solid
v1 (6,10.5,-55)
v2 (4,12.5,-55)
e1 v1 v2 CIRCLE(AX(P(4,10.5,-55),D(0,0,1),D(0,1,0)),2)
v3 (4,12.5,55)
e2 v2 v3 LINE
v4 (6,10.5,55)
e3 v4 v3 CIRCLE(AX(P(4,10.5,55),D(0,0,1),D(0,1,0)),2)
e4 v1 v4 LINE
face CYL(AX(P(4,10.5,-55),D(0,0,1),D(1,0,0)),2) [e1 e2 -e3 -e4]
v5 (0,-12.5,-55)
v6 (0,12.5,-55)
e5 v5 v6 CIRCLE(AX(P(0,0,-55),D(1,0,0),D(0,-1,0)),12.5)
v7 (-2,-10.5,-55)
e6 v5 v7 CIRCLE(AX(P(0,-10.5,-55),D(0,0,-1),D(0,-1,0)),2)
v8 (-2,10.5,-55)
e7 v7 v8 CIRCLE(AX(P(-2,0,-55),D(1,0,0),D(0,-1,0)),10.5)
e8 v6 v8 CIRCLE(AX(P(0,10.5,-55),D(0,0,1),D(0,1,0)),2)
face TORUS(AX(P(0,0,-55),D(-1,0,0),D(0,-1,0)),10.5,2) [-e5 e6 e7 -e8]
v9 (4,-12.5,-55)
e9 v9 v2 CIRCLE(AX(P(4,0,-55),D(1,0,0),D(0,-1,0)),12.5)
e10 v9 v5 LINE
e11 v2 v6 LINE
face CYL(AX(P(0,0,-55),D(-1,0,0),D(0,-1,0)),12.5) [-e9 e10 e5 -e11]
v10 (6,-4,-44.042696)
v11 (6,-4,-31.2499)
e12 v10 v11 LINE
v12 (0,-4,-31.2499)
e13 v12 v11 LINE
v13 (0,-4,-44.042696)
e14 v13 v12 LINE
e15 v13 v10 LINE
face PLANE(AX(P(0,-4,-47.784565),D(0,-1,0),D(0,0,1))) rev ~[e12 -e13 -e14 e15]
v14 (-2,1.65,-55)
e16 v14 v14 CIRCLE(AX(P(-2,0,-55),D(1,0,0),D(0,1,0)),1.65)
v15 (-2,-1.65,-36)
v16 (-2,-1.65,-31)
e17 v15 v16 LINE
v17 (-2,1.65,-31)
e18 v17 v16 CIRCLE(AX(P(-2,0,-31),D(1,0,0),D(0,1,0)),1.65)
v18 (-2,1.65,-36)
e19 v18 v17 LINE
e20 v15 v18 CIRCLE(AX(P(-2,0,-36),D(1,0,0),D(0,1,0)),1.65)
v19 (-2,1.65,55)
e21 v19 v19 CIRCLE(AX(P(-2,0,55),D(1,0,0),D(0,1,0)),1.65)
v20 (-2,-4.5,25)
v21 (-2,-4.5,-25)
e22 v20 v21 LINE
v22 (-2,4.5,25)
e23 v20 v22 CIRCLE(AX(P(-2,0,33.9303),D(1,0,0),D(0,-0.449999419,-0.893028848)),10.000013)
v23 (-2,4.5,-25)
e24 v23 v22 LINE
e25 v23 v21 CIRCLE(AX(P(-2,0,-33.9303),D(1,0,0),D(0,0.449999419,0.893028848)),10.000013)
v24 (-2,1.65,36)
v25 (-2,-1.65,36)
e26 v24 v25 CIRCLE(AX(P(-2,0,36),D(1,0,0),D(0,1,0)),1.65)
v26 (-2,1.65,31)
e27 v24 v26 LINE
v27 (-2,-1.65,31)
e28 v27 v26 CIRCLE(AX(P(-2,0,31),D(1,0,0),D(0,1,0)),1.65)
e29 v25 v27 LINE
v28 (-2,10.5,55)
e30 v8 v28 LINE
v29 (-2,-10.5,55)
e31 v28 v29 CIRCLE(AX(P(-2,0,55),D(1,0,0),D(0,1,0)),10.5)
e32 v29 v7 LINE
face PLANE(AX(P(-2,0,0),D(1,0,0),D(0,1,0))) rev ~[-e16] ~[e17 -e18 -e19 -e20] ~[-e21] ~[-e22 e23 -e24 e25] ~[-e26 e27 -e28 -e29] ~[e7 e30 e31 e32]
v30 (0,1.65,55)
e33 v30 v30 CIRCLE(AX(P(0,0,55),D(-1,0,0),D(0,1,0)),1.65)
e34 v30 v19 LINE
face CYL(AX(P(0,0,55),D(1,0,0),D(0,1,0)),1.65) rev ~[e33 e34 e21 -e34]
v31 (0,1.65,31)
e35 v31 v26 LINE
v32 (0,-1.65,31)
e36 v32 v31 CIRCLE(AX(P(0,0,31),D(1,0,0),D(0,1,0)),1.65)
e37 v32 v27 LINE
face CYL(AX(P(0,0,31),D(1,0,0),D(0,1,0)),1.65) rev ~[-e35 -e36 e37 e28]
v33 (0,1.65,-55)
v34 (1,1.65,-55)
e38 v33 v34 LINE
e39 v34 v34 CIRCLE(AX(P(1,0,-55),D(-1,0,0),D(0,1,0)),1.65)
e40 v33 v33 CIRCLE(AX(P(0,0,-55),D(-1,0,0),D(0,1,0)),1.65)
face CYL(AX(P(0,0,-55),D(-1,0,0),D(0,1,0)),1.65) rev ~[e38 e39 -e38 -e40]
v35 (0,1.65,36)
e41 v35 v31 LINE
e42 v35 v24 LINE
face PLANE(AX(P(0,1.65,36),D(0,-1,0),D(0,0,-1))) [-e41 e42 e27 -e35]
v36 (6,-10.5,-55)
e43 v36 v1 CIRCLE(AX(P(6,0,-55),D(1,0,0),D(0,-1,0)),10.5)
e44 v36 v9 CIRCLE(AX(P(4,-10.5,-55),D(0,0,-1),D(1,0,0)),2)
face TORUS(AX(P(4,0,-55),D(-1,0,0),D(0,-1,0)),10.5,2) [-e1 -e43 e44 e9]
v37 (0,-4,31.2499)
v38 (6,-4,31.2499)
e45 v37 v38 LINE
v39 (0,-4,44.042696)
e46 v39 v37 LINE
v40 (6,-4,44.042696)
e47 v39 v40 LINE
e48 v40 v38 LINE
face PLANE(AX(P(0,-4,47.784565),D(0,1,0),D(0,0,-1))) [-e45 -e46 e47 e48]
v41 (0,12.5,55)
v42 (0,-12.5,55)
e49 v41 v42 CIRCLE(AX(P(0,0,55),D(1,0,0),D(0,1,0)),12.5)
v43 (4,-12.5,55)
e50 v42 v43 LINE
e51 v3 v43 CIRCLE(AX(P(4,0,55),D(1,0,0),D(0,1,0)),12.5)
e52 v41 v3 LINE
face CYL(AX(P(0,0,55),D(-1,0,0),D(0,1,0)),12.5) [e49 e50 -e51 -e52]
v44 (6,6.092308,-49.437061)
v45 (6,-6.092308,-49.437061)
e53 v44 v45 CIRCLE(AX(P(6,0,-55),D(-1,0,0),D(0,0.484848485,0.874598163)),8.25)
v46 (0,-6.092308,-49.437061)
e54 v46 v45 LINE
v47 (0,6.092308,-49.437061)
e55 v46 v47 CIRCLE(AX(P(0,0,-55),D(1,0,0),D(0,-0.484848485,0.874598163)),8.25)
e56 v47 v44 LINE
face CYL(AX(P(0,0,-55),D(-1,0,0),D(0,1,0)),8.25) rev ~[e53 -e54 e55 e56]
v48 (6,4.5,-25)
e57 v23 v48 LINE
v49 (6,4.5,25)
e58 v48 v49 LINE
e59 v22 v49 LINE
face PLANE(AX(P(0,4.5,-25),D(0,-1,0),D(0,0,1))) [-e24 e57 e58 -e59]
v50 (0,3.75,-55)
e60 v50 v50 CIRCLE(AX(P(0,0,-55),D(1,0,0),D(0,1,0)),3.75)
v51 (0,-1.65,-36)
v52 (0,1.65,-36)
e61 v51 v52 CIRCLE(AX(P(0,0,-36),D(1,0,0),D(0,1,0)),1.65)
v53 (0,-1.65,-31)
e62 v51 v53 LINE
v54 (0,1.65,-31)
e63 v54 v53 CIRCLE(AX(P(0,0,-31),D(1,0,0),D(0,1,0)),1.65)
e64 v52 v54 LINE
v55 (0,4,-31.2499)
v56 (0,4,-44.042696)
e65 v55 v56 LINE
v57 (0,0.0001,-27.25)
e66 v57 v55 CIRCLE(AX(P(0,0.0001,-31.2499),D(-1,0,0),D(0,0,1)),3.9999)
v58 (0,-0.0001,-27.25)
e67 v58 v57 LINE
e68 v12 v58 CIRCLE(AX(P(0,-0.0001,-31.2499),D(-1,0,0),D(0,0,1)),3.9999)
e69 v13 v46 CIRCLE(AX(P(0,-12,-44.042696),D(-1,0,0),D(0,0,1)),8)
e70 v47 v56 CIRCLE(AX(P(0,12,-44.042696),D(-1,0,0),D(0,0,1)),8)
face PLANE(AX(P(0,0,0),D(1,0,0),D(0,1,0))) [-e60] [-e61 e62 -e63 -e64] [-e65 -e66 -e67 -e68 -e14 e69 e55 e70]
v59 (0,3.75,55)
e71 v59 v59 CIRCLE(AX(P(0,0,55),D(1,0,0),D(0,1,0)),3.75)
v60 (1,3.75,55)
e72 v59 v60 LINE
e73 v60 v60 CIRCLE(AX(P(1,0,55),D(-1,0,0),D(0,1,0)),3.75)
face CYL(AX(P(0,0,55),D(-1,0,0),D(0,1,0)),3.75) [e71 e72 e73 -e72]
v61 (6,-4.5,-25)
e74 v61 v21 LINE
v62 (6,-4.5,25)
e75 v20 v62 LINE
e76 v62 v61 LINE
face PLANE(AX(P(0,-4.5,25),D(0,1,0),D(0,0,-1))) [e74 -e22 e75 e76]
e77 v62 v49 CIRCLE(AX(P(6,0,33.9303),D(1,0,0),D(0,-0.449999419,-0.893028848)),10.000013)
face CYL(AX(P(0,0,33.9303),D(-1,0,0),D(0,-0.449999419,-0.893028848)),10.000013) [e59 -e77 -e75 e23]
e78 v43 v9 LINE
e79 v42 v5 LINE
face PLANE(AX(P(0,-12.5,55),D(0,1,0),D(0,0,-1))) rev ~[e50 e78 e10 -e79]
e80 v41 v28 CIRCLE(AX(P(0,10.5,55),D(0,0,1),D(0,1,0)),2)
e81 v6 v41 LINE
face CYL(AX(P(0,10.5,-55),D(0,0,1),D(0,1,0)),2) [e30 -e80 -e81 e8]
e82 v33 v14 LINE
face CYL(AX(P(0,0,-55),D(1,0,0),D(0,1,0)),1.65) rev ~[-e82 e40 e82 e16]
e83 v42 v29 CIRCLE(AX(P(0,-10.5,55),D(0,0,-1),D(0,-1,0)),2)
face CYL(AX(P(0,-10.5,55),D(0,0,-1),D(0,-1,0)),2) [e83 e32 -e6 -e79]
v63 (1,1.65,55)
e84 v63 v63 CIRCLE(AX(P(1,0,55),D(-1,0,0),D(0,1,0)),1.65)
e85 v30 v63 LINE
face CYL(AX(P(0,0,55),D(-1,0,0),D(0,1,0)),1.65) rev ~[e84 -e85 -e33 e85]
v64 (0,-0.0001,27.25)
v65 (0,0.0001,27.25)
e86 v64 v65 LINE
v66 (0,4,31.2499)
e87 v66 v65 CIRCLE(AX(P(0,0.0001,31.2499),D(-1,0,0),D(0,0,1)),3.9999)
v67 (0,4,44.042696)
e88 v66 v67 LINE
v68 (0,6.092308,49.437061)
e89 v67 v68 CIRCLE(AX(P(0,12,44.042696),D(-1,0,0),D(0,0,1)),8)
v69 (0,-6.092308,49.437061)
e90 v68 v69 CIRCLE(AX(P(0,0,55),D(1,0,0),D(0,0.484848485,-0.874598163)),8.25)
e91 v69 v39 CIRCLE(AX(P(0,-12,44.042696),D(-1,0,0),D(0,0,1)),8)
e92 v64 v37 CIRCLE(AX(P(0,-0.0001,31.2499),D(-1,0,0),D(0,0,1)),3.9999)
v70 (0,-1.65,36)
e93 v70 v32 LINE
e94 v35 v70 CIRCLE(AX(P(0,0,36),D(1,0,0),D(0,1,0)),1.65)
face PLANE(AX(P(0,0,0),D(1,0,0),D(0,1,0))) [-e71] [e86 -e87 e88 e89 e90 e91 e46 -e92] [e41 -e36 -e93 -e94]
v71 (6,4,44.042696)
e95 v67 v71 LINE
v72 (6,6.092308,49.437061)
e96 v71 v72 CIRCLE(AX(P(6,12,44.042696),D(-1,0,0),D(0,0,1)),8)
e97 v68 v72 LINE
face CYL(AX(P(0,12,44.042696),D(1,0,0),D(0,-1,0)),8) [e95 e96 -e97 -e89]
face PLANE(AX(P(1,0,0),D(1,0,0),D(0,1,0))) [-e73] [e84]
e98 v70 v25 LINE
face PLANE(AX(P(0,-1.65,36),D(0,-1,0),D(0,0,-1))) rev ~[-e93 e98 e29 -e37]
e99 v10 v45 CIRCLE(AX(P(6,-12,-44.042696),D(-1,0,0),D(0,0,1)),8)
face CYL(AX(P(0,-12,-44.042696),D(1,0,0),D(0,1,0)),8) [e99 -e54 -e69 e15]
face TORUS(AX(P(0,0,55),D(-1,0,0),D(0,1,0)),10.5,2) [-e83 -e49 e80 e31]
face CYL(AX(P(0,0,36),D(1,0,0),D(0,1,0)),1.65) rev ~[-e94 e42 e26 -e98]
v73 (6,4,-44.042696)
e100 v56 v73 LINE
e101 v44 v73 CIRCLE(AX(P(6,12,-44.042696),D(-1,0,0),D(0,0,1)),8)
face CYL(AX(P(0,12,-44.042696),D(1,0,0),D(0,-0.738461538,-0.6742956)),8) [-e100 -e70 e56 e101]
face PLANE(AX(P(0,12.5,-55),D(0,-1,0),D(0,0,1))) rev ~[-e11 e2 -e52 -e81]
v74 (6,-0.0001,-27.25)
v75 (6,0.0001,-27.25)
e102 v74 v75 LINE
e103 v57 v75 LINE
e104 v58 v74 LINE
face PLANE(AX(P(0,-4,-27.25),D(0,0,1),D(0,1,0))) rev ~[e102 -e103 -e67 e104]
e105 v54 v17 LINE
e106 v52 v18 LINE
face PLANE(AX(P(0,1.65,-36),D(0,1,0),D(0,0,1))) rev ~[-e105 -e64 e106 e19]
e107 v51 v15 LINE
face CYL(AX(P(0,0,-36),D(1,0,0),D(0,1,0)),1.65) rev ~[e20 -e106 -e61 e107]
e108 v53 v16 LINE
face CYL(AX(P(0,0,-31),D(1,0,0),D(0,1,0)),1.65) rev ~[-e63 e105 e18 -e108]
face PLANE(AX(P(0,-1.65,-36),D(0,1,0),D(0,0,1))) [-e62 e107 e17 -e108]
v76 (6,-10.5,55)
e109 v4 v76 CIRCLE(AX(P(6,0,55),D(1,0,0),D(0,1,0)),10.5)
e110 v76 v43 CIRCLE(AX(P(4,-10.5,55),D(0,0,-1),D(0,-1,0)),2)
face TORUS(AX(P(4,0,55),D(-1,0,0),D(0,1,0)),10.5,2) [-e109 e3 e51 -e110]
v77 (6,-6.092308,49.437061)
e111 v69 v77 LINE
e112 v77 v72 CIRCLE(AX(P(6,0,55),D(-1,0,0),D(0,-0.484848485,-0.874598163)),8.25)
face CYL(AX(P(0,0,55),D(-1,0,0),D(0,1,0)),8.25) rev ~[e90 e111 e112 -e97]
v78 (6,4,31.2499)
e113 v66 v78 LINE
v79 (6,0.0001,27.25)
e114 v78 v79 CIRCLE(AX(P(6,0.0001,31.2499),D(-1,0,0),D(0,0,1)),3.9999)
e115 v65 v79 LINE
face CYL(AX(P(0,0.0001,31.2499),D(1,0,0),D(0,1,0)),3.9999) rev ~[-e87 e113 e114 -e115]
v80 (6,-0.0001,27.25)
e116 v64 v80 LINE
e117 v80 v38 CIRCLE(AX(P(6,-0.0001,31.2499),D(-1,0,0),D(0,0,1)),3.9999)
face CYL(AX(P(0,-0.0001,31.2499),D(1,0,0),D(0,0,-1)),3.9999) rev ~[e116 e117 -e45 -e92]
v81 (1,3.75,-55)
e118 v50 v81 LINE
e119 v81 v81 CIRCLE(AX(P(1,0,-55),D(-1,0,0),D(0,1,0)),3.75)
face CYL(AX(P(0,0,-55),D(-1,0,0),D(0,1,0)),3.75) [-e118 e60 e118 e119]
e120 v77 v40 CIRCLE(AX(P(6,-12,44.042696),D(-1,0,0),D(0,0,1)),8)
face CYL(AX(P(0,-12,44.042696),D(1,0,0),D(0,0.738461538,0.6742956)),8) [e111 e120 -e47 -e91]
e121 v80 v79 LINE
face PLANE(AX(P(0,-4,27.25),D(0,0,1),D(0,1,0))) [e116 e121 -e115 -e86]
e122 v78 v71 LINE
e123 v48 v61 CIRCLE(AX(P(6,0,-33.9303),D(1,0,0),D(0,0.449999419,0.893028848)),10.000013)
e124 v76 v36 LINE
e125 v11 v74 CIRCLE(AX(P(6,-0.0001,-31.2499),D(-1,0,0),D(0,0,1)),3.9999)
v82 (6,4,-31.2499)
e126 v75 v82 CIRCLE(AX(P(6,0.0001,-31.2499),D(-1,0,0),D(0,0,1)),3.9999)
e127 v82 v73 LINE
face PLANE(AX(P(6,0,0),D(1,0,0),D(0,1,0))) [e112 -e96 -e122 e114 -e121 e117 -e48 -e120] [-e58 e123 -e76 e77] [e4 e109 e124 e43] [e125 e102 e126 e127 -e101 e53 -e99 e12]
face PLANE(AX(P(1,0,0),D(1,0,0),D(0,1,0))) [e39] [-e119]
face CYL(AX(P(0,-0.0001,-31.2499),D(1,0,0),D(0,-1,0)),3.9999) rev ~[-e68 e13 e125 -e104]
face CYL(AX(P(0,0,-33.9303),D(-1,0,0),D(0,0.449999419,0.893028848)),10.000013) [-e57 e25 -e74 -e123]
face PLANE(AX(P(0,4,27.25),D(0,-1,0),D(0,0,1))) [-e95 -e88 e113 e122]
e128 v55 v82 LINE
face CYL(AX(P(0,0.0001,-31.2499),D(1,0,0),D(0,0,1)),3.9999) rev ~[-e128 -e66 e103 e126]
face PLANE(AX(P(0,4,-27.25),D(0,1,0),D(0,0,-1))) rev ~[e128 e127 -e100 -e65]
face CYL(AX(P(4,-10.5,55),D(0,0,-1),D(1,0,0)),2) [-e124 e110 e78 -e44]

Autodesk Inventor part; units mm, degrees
ref_plane "YZ Plane" through (0, 0, 0) normal (1, 0, 0) x (0, 1, 0)
ref_plane "XZ Plane" through (0, 0, 0) normal (0, 1, 0) x (-1, 0, 0)
ref_plane "XY Plane" through (0, 0, 0) normal (0, 0, 1) x (1, 0, 0)
sketch "Sketch1" plane through (0, 0, 0) normal (1, 0, 0) x (0, 1, 0)
  line L0 (12.5, 55) -> (-12.5, 55)
  line L1 (-12.5, 55) -> (-12.5, -55)
  line L2 (-12.5, -55) -> (12.5, -55)
  line L3 (12.5, -55) -> (12.5, 55)
  arc A0 (12.5, 55) -> (-12.5, 55) centre (0, 55) ccw
  arc A1 (-12.5, -55) -> (12.5, -55) centre (0, -55) ccw
  circle A2 centre (0, 55) radius 1.65
  circle A3 centre (0, 55) radius 3.75
  circle A4 centre (0, 55) radius 8.25
  line L4 (4, 55) -> (-4, 55)
  line L5 (-4, 55) -> (-4, 27.25)
  line L6 (-4, 27.25) -> (4, 27.25)
  line L7 (4, 27.25) -> (4, 55)
  circle A5 centre (0, 31) radius 1.65
  circle A6 centre (0, 36) radius 1.65
  line L8 (1.65, 36) -> (1.65, 31)
  line L9 (-1.65, 36) -> (-1.65, 31)
  line L10 (12.5, 0) -> (-12.5, 0) construction
  circle A7 centre (0, -55) radius 1.65
  circle A8 centre (0, -55) radius 3.75
  circle A9 centre (0, -55) radius 8.25
  line L11 (-4, -55) -> (-4, -27.25)
  line L12 (-4, -27.25) -> (4, -27.25)
  line L13 (4, -27.25) -> (4, -55)
  circle A10 centre (0, -31) radius 1.65
  circle A11 centre (0, -36) radius 1.65
  line L14 (1.65, -36) -> (1.65, -31)
  line L15 (-1.65, -36) -> (-1.65, -31)
  line L16 (4.5, 25) -> (-4.5, 25)
  line L17 (-4.5, 25) -> (-4.5, -25)
  line L18 (-4.5, -25) -> (4.5, -25)
  line L19 (4.5, -25) -> (4.5, 25)
  line L20 (4.5, 25) -> (-4.5, -25) construction
  line L21 (-4.5, 25) -> (4.5, -25) construction
  arc A12 (-4.5, 25) -> (4.5, 25) centre (0, 33.9303) ccw
  arc A13 (4.5, -25) -> (-4.5, -25) centre (0, -33.9303) ccw
  point P0 (0, 0)
  point P1 (0, 55)
  point P2 (-4, -47.7846)
  point P3 (4, -47.7846)
  point P4 (4, 47.7846)
  point P5 (-4, 47.7846)
  point P6 (0, 0)
  point P7 (3.75, 55)
  point P8 (-3.75, 55)
  dimension "d0" = 110
  dimension "d1" = 55
  dimension "d2" = 12.5
  dimension "d3" = 25
  dimension "d4" = 3.3
  dimension "d5" = 7.5
  dimension "d6" = 16.5
  dimension "d7" = 8
  dimension "d8" = 4
  dimension "d10" = 36
  dimension "d11" = 3.3
  dimension "d12" = 24
  dimension "d13" = 4
  dimension "d14" = 3.3
  dimension "d15" = 5
  dimension "d16" = 4
  dimension "d34" = 50
  dimension "d35" = 8
  dimension "d36" = 8
  dimension "d37" = 10
  dimension "d38" = 10
extrude "Extrusion1" add sketch "Sketch1" along normal blind 6 contours L3 L2 A9 L13 L12 L11 L1 L0 A4 L5 L6 L7 | L0 A4 A0 | A1 L2 A9 | A12 L16 | L18 A13
extrude "Extrusion2" add sketch "Sketch1" against normal blind 2 contours L3 L2 A9 L13 L12 L11 L1 L0 A4 L5 L6 L7 | L0 A4 A0 | A4 L7 L0 | L0 A3 A4 | A1 L2 A9 | L7 A4 L5 L0 A3 | L0 L5 A4 | L7 L6 L5 A4 | A9 L2 A8 | L2 L13 A9 | A3 L0 A2 | L0 A2 A3 | L2 A8 L11 A9 L13 | A9 L11 L12 L13 | A9 L11 L2 | A8 L2 A7 | L2 A7 A8 | A12 L16 | L18 A13
extrude "Extrusion3" add sketch "Sketch1" along normal blind 1 contours A3 L0 A2 | L0 A2 A3 | A8 L2 A7 | L2 A7 A8
fillet "Fillet1" radius 4 4 edges at (3, -4, 27.25) (3, 4, 27.25) (3, -4, -27.25) (3, 4, -27.25)
fillet "Fillet2" radius 8 4 edges at (3, -4, -47.7846) (3, 4, -47.7846) (3, -4, 47.7846) (3, 4, 47.7846)
fillet "Fillet3" radius 2 8 edges at (6, 0, 67.5) (6, -12.5, 0) (6, 0, -67.5) (6, 12.5, 0) (-2, 0, -67.5) (-2, -12.5, 0) (-2, 0, 67.5) (-2, 12.5, 0)
equation "\"d0\" = FEMUR_LENGTH"
equation "\"d1\" = 0.5 * FEMUR_LENGTH"
equation "\"d2\" = 0.5 * FEMUR_WIDTH"
equation "\"d3\" = FEMUR_WIDTH"
equation "\"d4\" = HornScrewDiameter"
equation "\"d5\" = HornCentreDiameter"
equation "\"d6\" = HornDiameter"
equation "\"d7\" = HornWidth"
equation "\"d8\" = 0.5 * HornWidth"
equation "\"d10\" = HornLength"
equation "\"d11\" = HornScrewDiameter"
equation "\"d12\" = HornScrewX"
equation "\"d13\" = 0.5 * HornWidth"
equation "\"d14\" = HornScrewDiameter"
equation "\"d15\" = HornScrewLen"
equation "\"d16\" = 0.5 * HornWidth"
equation "\"d17\" = HornHeight"
equation "\"d19\" = FEMUR_HEIGHT - HornHeight"
equation "\"d21\" = HornCentreHeight"
equation "\"d23\" = 0.5 * HornWidth"
equation "\"d24\" = HornFillet"
equation "\"d25\" = PART_FILLET"
equation "\"FEMUR_LENGTH\" = 110"
equation "\"FEMUR_WIDTH\" = 25"
equation "\"HornScrewDiameter\" = 3.3"
equation "\"HornCentreDiameter\" = 7.5"
equation "\"HornDiameter\" = 16.5"
equation "\"HornWidth\" = 8"
equation "\"HornLength\" = 36"
equation "\"HornScrewLen\" = 5"
equation "\"HornHeight\" = 6"
equation "\"FEMUR_HEIGHT\" = 8"
equation "\"HornCentreHeight\" = 1"
equation "\"HornFillet\" = 8"
equation "\"PART_FILLET\" = 2"
equation "\"HornScrewX\" = 24"
properties part number "FemurHornSide"
